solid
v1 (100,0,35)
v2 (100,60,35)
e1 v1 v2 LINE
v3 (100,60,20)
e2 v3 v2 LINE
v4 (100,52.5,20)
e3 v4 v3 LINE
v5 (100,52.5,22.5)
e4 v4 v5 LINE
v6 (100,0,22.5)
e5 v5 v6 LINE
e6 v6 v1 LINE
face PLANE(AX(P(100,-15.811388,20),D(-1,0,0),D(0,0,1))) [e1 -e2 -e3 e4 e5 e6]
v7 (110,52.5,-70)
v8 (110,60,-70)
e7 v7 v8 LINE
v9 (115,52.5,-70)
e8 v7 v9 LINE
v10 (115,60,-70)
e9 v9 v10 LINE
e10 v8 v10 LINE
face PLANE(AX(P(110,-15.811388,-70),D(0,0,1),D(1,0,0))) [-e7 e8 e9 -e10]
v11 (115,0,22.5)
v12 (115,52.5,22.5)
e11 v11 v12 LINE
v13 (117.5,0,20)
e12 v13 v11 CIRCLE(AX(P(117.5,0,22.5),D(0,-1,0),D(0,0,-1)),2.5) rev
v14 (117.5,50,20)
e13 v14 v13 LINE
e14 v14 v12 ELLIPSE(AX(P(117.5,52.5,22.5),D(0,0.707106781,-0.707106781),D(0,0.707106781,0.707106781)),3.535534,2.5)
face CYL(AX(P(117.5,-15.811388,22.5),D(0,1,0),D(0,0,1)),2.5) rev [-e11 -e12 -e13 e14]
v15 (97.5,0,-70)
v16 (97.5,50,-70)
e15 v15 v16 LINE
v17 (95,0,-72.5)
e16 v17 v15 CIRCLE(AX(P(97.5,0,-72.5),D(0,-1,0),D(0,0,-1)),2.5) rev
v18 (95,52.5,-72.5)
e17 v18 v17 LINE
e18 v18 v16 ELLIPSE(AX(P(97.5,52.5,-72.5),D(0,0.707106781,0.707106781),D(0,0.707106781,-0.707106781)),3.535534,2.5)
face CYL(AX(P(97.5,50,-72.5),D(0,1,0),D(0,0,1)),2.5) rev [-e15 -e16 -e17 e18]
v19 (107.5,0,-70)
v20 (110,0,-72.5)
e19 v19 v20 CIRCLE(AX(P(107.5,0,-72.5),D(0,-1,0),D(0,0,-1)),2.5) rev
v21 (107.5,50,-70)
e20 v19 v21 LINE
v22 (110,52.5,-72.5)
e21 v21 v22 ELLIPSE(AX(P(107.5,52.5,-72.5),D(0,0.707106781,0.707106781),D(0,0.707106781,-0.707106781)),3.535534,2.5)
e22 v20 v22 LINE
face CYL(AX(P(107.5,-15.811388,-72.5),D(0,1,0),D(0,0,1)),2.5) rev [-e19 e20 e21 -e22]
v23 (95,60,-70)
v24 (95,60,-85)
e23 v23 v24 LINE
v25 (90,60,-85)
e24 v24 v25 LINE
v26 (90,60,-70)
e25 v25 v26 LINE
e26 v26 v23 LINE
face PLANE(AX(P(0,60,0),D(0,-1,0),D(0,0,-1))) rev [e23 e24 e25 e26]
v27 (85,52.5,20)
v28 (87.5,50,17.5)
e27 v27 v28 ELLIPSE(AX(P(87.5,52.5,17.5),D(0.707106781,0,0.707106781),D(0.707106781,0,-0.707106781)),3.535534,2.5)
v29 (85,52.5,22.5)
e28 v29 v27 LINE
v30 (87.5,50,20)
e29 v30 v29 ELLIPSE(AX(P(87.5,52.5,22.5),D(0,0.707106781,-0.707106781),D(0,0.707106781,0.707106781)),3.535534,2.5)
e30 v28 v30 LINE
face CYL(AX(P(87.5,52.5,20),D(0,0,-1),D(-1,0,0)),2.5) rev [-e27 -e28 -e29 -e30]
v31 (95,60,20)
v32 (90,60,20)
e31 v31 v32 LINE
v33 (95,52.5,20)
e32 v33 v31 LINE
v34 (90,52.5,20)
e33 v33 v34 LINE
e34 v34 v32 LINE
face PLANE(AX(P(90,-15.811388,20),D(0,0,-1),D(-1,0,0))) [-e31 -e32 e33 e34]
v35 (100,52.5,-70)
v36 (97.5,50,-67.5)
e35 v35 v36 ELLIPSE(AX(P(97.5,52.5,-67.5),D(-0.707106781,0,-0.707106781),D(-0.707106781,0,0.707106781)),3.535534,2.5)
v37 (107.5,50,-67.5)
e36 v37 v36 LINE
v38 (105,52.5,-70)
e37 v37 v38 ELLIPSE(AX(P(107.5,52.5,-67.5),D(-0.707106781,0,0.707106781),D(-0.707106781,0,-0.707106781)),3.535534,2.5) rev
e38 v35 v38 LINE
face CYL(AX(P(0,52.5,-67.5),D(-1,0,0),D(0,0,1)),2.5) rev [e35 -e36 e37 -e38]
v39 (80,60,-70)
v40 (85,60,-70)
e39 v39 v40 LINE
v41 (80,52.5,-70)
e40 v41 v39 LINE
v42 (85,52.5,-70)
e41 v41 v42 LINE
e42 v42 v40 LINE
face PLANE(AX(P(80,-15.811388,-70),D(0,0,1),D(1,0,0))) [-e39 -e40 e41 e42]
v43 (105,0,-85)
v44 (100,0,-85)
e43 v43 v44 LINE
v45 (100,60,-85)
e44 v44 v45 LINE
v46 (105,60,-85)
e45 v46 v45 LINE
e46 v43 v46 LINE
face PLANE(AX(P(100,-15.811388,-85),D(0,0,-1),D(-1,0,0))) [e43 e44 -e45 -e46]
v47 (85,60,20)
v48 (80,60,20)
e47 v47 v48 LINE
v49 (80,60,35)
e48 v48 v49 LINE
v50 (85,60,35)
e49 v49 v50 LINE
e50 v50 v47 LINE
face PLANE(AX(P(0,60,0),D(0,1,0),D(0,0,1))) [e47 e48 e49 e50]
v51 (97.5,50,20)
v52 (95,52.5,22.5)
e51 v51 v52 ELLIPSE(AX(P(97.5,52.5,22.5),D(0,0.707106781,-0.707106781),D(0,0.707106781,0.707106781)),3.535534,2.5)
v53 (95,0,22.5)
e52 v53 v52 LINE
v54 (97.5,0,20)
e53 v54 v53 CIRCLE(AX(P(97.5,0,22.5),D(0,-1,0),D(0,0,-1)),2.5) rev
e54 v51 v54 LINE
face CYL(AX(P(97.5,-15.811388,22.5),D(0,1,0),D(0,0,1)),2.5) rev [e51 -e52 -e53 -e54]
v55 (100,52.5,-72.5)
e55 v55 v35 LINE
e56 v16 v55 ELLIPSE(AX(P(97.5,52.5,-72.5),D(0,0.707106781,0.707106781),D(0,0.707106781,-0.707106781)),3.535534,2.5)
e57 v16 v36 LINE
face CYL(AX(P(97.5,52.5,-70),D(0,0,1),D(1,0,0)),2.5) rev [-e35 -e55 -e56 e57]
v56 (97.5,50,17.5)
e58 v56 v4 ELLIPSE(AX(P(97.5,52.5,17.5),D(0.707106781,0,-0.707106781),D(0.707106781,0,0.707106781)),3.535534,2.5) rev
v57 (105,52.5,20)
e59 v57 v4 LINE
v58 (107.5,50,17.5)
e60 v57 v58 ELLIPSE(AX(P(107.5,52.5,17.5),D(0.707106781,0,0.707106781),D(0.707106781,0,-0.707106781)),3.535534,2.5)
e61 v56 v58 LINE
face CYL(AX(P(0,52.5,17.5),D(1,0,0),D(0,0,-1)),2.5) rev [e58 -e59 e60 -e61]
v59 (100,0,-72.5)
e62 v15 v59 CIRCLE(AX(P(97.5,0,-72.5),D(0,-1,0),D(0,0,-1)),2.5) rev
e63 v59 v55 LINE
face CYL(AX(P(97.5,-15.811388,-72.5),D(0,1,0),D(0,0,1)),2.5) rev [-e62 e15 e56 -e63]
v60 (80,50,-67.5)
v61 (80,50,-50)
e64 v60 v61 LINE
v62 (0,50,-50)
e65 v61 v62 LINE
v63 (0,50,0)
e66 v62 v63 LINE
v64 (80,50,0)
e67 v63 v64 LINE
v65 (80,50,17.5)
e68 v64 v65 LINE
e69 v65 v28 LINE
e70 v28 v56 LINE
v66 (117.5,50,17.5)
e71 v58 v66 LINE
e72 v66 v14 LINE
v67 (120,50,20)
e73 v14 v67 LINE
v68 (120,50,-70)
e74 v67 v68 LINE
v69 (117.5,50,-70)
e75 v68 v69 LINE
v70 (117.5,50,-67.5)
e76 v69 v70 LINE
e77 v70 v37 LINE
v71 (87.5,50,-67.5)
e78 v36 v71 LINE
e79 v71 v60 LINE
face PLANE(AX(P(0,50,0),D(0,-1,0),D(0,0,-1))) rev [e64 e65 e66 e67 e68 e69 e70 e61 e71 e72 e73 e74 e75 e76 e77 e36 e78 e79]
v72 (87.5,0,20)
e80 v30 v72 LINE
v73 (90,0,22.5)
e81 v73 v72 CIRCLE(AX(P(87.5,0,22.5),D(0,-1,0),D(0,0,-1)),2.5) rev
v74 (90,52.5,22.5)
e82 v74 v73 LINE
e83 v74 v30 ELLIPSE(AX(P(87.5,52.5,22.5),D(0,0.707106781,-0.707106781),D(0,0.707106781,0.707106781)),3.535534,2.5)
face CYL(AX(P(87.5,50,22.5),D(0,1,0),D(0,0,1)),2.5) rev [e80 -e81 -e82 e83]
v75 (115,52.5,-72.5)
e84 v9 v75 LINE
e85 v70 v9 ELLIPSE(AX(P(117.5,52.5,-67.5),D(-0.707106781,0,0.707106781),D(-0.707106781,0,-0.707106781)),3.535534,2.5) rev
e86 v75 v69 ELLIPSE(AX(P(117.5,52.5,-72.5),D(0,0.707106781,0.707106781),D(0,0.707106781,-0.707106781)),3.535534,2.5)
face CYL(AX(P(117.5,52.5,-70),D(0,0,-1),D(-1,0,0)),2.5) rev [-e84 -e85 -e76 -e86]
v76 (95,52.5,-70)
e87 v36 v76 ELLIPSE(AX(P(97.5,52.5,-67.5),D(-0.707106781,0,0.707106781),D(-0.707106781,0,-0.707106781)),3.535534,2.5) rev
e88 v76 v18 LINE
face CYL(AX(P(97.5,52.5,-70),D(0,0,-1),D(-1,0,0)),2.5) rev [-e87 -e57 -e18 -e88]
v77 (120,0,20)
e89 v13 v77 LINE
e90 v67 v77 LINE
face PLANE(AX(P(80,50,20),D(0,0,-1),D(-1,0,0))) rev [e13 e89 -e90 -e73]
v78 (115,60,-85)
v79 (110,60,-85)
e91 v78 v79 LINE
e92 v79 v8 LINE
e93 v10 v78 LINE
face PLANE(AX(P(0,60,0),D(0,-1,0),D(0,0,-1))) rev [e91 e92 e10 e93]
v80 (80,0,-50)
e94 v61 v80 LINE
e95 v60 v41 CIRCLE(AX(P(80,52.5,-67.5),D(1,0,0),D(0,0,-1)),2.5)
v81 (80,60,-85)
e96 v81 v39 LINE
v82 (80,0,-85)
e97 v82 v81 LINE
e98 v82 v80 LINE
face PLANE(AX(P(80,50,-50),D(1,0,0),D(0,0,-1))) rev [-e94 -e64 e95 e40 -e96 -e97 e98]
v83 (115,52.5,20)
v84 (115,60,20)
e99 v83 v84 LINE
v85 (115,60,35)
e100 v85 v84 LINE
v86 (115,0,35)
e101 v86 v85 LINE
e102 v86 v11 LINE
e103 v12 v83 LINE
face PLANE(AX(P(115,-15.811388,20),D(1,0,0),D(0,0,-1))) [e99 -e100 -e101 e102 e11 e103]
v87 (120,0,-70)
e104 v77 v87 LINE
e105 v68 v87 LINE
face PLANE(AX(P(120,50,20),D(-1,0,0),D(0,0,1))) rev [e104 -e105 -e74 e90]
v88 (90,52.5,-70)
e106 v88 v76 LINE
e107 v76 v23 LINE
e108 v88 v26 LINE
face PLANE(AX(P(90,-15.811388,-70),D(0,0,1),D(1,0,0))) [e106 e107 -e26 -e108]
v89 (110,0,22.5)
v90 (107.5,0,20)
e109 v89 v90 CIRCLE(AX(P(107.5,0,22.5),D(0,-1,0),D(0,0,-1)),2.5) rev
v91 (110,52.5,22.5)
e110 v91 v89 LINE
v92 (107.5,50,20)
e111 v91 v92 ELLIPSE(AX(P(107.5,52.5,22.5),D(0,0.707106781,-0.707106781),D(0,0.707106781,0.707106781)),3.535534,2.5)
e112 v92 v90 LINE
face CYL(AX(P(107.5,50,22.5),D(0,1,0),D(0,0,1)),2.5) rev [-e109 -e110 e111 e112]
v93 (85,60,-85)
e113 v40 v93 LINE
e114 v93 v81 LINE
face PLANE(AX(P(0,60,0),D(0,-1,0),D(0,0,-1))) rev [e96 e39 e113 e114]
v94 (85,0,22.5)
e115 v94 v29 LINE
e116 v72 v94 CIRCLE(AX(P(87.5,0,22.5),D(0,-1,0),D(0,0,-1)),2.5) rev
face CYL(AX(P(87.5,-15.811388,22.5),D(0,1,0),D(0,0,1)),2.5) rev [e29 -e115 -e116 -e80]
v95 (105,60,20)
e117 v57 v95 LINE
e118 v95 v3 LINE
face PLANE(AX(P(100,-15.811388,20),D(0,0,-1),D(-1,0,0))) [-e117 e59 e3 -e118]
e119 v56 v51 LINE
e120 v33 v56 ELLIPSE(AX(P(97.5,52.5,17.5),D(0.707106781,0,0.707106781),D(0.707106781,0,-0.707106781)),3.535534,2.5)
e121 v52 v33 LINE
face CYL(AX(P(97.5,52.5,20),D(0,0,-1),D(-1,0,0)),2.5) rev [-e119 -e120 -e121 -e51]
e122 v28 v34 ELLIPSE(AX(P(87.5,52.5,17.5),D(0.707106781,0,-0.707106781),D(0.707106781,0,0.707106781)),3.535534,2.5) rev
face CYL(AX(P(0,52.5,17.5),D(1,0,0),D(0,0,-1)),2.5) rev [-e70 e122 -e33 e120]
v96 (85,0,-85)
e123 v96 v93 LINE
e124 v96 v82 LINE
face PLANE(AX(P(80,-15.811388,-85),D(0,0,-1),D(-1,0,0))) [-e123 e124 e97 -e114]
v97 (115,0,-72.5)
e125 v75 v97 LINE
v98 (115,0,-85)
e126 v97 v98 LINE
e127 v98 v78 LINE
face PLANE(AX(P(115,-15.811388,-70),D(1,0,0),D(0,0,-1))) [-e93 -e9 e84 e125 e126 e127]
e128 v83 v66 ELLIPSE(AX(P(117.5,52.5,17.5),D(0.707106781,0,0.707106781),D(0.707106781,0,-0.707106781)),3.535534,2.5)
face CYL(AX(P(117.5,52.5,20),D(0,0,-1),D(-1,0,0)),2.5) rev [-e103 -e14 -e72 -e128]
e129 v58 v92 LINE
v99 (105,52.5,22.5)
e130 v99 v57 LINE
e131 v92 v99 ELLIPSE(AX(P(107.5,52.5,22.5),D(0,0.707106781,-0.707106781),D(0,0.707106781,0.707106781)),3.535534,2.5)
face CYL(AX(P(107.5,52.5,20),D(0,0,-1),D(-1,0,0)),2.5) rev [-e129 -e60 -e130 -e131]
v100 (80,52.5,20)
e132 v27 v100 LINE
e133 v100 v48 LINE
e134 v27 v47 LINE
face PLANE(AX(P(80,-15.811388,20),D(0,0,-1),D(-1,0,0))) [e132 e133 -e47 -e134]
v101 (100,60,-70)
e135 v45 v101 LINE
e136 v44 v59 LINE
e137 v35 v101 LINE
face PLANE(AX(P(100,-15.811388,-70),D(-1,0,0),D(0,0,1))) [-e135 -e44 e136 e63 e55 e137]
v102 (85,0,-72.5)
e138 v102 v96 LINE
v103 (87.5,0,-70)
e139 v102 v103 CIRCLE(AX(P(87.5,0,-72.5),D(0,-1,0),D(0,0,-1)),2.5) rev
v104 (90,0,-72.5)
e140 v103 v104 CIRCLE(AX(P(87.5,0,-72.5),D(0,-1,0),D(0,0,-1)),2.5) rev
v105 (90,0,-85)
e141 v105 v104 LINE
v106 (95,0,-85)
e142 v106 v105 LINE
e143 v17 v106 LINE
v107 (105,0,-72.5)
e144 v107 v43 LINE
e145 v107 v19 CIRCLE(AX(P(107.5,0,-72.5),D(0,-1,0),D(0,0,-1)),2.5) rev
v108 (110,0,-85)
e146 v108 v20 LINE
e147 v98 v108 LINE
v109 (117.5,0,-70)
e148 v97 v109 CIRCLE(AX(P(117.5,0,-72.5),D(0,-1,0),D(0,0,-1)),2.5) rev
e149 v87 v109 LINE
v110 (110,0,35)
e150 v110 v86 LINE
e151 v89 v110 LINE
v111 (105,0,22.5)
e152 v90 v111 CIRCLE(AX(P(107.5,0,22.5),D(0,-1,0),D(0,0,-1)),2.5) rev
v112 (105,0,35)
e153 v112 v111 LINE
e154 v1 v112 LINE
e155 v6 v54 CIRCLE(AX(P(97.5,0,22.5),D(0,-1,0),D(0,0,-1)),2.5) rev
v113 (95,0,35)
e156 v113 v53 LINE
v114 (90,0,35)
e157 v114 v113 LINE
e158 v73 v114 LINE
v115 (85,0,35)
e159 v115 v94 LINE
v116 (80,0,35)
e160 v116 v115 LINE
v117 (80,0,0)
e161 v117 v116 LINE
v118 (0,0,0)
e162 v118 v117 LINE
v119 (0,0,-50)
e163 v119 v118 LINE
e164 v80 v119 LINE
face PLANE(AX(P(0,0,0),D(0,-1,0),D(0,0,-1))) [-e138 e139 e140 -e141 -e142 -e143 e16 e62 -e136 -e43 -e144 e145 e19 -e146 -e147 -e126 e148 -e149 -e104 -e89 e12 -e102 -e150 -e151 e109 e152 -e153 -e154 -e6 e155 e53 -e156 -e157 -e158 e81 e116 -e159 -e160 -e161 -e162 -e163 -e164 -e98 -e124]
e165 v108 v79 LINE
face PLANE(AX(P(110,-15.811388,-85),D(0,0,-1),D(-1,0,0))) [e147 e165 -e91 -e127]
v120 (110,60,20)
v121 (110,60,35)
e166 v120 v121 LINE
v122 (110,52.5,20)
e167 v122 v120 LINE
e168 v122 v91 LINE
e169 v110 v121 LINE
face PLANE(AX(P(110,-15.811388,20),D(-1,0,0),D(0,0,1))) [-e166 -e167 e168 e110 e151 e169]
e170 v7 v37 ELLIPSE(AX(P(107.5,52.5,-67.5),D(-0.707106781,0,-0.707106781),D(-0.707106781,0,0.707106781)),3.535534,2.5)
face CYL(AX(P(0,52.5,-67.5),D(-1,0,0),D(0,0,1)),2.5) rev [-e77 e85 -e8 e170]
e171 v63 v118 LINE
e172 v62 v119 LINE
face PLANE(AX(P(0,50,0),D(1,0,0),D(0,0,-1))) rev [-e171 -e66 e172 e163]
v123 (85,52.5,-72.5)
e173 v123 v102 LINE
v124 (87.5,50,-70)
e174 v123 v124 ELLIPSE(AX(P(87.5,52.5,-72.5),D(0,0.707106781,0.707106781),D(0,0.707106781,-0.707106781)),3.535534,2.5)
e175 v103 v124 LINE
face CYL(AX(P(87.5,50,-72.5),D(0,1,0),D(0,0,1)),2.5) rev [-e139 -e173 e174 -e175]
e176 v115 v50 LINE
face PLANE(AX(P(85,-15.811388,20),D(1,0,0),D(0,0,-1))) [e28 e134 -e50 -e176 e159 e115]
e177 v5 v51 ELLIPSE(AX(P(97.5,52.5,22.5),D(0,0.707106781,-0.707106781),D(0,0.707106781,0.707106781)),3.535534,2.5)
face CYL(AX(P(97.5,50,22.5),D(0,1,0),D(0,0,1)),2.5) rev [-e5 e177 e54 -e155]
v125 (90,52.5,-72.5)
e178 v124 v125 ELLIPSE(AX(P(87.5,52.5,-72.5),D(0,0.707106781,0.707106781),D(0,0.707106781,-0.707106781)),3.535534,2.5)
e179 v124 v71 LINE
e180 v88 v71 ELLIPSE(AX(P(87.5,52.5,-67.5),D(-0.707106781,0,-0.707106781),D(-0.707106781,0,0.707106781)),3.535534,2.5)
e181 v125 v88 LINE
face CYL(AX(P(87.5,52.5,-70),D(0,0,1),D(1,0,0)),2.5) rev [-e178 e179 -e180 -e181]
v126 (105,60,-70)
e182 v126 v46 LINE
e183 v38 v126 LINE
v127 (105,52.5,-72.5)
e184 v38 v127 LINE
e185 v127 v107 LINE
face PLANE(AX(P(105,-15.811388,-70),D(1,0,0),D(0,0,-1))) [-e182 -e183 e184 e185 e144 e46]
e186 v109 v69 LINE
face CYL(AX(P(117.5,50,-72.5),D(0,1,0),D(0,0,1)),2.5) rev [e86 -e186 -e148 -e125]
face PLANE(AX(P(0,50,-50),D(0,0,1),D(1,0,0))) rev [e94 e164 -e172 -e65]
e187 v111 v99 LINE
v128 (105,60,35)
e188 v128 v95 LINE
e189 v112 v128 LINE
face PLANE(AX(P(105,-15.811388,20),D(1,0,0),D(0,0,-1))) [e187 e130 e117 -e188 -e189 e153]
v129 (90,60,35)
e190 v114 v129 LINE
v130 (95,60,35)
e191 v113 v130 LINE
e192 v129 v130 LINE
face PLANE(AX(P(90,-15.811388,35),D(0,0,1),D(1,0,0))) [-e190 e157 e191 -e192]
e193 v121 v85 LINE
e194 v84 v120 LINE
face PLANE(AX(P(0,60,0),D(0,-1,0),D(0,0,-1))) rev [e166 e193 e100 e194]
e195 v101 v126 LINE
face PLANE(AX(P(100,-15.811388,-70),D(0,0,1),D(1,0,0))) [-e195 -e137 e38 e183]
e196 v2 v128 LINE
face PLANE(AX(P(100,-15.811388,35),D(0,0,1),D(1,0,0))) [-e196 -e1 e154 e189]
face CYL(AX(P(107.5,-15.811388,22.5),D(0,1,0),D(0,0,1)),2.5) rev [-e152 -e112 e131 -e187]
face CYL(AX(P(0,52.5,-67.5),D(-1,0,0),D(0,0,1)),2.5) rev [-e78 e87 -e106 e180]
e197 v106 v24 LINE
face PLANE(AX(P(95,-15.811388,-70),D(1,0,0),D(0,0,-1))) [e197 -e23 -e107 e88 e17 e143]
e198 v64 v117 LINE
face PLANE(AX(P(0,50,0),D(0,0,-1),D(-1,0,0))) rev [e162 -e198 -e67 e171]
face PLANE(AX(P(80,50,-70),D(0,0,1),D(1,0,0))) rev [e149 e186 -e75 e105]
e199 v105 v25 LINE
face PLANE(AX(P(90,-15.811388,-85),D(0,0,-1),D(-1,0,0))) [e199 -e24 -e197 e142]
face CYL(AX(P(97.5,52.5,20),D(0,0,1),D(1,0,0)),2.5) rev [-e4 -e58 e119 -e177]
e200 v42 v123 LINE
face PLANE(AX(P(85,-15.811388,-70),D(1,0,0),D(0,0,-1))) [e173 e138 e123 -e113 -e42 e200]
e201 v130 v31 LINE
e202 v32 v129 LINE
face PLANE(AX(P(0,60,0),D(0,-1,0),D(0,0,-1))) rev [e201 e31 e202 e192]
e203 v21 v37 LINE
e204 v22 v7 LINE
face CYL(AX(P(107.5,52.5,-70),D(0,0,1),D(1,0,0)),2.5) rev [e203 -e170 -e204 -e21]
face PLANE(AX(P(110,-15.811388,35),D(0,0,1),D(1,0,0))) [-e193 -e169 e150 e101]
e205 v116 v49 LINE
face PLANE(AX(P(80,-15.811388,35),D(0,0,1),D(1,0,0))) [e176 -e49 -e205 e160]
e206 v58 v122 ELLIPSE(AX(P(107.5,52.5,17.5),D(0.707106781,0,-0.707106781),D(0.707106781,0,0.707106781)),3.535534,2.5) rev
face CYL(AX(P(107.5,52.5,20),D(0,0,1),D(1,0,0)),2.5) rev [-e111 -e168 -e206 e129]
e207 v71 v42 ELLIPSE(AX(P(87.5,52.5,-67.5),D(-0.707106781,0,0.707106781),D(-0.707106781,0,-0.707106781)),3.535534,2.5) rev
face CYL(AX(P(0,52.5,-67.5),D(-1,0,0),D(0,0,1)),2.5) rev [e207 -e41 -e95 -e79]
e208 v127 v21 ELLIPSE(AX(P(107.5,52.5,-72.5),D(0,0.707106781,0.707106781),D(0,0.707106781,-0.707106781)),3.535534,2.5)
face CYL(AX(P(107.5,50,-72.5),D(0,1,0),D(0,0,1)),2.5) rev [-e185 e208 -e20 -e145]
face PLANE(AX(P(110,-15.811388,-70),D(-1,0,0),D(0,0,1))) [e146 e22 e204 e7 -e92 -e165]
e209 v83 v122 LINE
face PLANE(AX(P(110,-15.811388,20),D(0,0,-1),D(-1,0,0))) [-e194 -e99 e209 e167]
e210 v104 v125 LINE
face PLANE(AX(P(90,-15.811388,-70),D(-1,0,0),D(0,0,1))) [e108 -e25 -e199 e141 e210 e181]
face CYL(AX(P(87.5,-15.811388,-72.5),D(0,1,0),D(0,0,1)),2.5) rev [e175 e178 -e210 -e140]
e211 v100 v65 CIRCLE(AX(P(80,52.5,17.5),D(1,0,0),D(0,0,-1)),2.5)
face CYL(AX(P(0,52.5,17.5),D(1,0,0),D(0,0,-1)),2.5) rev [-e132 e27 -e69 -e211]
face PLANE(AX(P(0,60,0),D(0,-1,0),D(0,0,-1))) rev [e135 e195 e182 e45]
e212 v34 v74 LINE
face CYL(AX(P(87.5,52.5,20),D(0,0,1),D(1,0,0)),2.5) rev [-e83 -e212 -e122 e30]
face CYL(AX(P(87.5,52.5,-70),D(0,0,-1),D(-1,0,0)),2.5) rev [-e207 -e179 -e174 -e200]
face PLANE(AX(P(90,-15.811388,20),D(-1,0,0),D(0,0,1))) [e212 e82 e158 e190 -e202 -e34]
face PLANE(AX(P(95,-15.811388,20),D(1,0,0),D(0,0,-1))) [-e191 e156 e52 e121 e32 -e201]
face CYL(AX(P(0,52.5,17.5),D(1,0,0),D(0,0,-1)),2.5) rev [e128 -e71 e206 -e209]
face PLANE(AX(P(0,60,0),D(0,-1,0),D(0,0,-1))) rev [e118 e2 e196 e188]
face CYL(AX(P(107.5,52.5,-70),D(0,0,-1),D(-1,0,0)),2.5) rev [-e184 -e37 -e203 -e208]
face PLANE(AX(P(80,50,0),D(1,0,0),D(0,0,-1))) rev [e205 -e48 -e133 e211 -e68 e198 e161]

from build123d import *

# Parameters (mm, degrees)
BOSS_EXTRUDE1_DEPTH             = 50
SKETCH2_W                       = 5
SKETCH2_H                       = 15
BOSS_EXTRUDE2_DEPTH             = 10
BOSS_EXTRUDE2_DIRECTION_2_REACH = 149.648
FILLET1_R                       = 2.5
FILLET2_R                       = 2.5
FILLET4_R                       = 2.5


with BuildPart() as part:
    # Sketch1 → Boss-Extrude1 (new body)
    with BuildSketch(Plane(origin=(0, 0, 0), x_dir=(1, 0, 0), z_dir=(0, 1, 0))):
        Polygon((80, 50), (80, 70), (120, 70), (120, -20), (80, -20), (80, 0), (0, 0), (0, 50), align=None)
    extrude(amount=BOSS_EXTRUDE1_DEPTH)

    # Sketch2 → Boss-Extrude2 (add)
    with BuildSketch(Plane(origin=(0, 50, 0), x_dir=(1, 0, 0), z_dir=(0, 1, 0))):
        with Locations((82.5, -27.5)):
            Rectangle(SKETCH2_W, SKETCH2_H)
        with Locations((92.5, -27.5)):
            Rectangle(SKETCH2_W, SKETCH2_H)
        with Locations((102.5, -27.5)):
            Rectangle(SKETCH2_W, SKETCH2_H)
        with Locations((112.5, -27.5)):
            Rectangle(SKETCH2_W, SKETCH2_H)
        with Locations((112.5, 77.5)):
            Rectangle(SKETCH2_W, SKETCH2_H)
        with Locations((102.5, 77.5)):
            Rectangle(SKETCH2_W, SKETCH2_H)
        with Locations((92.5, 77.5)):
            Rectangle(SKETCH2_W, SKETCH2_H)
        with Locations((82.5, 77.5)):
            Rectangle(SKETCH2_W, SKETCH2_H)
    extrude(amount=BOSS_EXTRUDE2_DEPTH)

    # Boss-Extrude2 direction 2: up to this face of the body (flat: up to its plane)
    boss_extrude2_direction_2_end = Plane(part.part.faces().sort_by_distance((68.421052632, 0, -25))[0])
    # Sketch2 → Boss-Extrude2 direction 2 (add, up to the picked face)
    with BuildSketch(Plane(origin=(0, 50, 0), x_dir=(1, 0, 0), z_dir=(0, 1, 0)), mode=Mode.PRIVATE) as boss_extrude2_direction_2_sk1:
        with Locations((82.5, -27.5)):
            Rectangle(SKETCH2_W, SKETCH2_H)
    boss_extrude2_direction_2_tool1 = split(extrude(boss_extrude2_direction_2_sk1.sketch, amount=-BOSS_EXTRUDE2_DIRECTION_2_REACH, mode=Mode.PRIVATE), bisect_by=boss_extrude2_direction_2_end, keep=Keep.BOTH, mode=Mode.PRIVATE)
    # Sketch2 → Boss-Extrude2 direction 2 (add, up to the picked face)
    with BuildSketch(Plane(origin=(0, 50, 0), x_dir=(1, 0, 0), z_dir=(0, 1, 0)), mode=Mode.PRIVATE) as boss_extrude2_direction_2_sk2:
        with Locations((92.5, -27.5)):
            Rectangle(SKETCH2_W, SKETCH2_H)
    boss_extrude2_direction_2_tool2 = split(extrude(boss_extrude2_direction_2_sk2.sketch, amount=-BOSS_EXTRUDE2_DIRECTION_2_REACH, mode=Mode.PRIVATE), bisect_by=boss_extrude2_direction_2_end, keep=Keep.BOTH, mode=Mode.PRIVATE)
    # Sketch2 → Boss-Extrude2 direction 2 (add, up to the picked face)
    with BuildSketch(Plane(origin=(0, 50, 0), x_dir=(1, 0, 0), z_dir=(0, 1, 0)), mode=Mode.PRIVATE) as boss_extrude2_direction_2_sk3:
        with Locations((102.5, -27.5)):
            Rectangle(SKETCH2_W, SKETCH2_H)
    boss_extrude2_direction_2_tool3 = split(extrude(boss_extrude2_direction_2_sk3.sketch, amount=-BOSS_EXTRUDE2_DIRECTION_2_REACH, mode=Mode.PRIVATE), bisect_by=boss_extrude2_direction_2_end, keep=Keep.BOTH, mode=Mode.PRIVATE)
    # Sketch2 → Boss-Extrude2 direction 2 (add, up to the picked face)
    with BuildSketch(Plane(origin=(0, 50, 0), x_dir=(1, 0, 0), z_dir=(0, 1, 0)), mode=Mode.PRIVATE) as boss_extrude2_direction_2_sk4:
        with Locations((112.5, -27.5)):
            Rectangle(SKETCH2_W, SKETCH2_H)
    boss_extrude2_direction_2_tool4 = split(extrude(boss_extrude2_direction_2_sk4.sketch, amount=-BOSS_EXTRUDE2_DIRECTION_2_REACH, mode=Mode.PRIVATE), bisect_by=boss_extrude2_direction_2_end, keep=Keep.BOTH, mode=Mode.PRIVATE)
    # Sketch2 → Boss-Extrude2 direction 2 (add, up to the picked face)
    with BuildSketch(Plane(origin=(0, 50, 0), x_dir=(1, 0, 0), z_dir=(0, 1, 0)), mode=Mode.PRIVATE) as boss_extrude2_direction_2_sk5:
        with Locations((112.5, 77.5)):
            Rectangle(SKETCH2_W, SKETCH2_H)
    boss_extrude2_direction_2_tool5 = split(extrude(boss_extrude2_direction_2_sk5.sketch, amount=-BOSS_EXTRUDE2_DIRECTION_2_REACH, mode=Mode.PRIVATE), bisect_by=boss_extrude2_direction_2_end, keep=Keep.BOTH, mode=Mode.PRIVATE)
    # Sketch2 → Boss-Extrude2 direction 2 (add, up to the picked face)
    with BuildSketch(Plane(origin=(0, 50, 0), x_dir=(1, 0, 0), z_dir=(0, 1, 0)), mode=Mode.PRIVATE) as boss_extrude2_direction_2_sk6:
        with Locations((102.5, 77.5)):
            Rectangle(SKETCH2_W, SKETCH2_H)
    boss_extrude2_direction_2_tool6 = split(extrude(boss_extrude2_direction_2_sk6.sketch, amount=-BOSS_EXTRUDE2_DIRECTION_2_REACH, mode=Mode.PRIVATE), bisect_by=boss_extrude2_direction_2_end, keep=Keep.BOTH, mode=Mode.PRIVATE)
    # Sketch2 → Boss-Extrude2 direction 2 (add, up to the picked face)
    with BuildSketch(Plane(origin=(0, 50, 0), x_dir=(1, 0, 0), z_dir=(0, 1, 0)), mode=Mode.PRIVATE) as boss_extrude2_direction_2_sk7:
        with Locations((92.5, 77.5)):
            Rectangle(SKETCH2_W, SKETCH2_H)
    boss_extrude2_direction_2_tool7 = split(extrude(boss_extrude2_direction_2_sk7.sketch, amount=-BOSS_EXTRUDE2_DIRECTION_2_REACH, mode=Mode.PRIVATE), bisect_by=boss_extrude2_direction_2_end, keep=Keep.BOTH, mode=Mode.PRIVATE)
    # Sketch2 → Boss-Extrude2 direction 2 (add, up to the picked face)
    with BuildSketch(Plane(origin=(0, 50, 0), x_dir=(1, 0, 0), z_dir=(0, 1, 0)), mode=Mode.PRIVATE) as boss_extrude2_direction_2_sk8:
        with Locations((82.5, 77.5)):
            Rectangle(SKETCH2_W, SKETCH2_H)
    boss_extrude2_direction_2_tool8 = split(extrude(boss_extrude2_direction_2_sk8.sketch, amount=-BOSS_EXTRUDE2_DIRECTION_2_REACH, mode=Mode.PRIVATE), bisect_by=boss_extrude2_direction_2_end, keep=Keep.BOTH, mode=Mode.PRIVATE)
    add(boss_extrude2_direction_2_tool1.solids().sort_by(Axis((82.5, 50, 27.5), (0, -1, 0)))[0])
    add(boss_extrude2_direction_2_tool2.solids().sort_by(Axis((92.5, 50, 27.5), (0, -1, 0)))[0])
    add(boss_extrude2_direction_2_tool3.solids().sort_by(Axis((102.5, 50, 27.5), (0, -1, 0)))[0])
    add(boss_extrude2_direction_2_tool4.solids().sort_by(Axis((112.5, 50, 27.5), (0, -1, 0)))[0])
    add(boss_extrude2_direction_2_tool5.solids().sort_by(Axis((112.5, 50, -77.5), (0, -1, 0)))[0])
    add(boss_extrude2_direction_2_tool6.solids().sort_by(Axis((102.5, 50, -77.5), (0, -1, 0)))[0])
    add(boss_extrude2_direction_2_tool7.solids().sort_by(Axis((92.5, 50, -77.5), (0, -1, 0)))[0])
    add(boss_extrude2_direction_2_tool8.solids().sort_by(Axis((82.5, 50, -77.5), (0, -1, 0)))[0])

    # Fillet1
    fillet1_edges = [part.edges().sort_by_distance(p)[0] for p in [
        (85, 25, -70),
        (85, 25, 20),
        (115, 25, -70),
        (110, 25, -70),
        (95, 25, 20),
        (90, 25, 20),
        (105, 25, 20),
        (100, 25, 20),
        (115, 25, 20),
        (110, 25, 20),
        (105, 25, -70),
        (100, 25, -70),
        (95, 25, -70),
        (90, 25, -70),
    ]]
    fillet(fillet1_edges, radius=FILLET1_R - 0.0001)  # a hair under: the kernel refuses the full size

    # Fillet2
    fillet2_edges = [part.edges().sort_by_distance(p)[0] for p in [
        (82.5, 50, -70),
        (82.5, 50, 20),
        (112.5, 50, -70),
        (92.5, 50, 20),
        (102.5, 50, 20),
        (112.5, 50, 20),
        (102.5, 50, -70),
        (92.5, 50, -70),
    ]]
    fillet(fillet2_edges, radius=FILLET2_R)

    # Fillet4
    fillet4_edges = [part.edges().sort_by_distance(p)[0] for p in [
        (110, 50, -69.99995),
        (100, 50, -69.99995),
        (90, 50, -69.99995),
        (110, 50, 19.99995),
        (100, 50, 19.99995),
        (90, 50, 19.99995),
        (115, 50, -69.99995),
        (105, 50, -69.99995),
        (95, 50, -69.99995),
        (85, 50, -69.99995),
        (85, 50, 19.99995),
        (95, 50, 19.99995),
        (105, 50, 19.99995),
        (115, 50, 19.99995),
    ]]
    fillet(fillet4_edges, radius=FILLET4_R - 0.0001)  # a hair under: the kernel refuses the full size


solid = part.part
